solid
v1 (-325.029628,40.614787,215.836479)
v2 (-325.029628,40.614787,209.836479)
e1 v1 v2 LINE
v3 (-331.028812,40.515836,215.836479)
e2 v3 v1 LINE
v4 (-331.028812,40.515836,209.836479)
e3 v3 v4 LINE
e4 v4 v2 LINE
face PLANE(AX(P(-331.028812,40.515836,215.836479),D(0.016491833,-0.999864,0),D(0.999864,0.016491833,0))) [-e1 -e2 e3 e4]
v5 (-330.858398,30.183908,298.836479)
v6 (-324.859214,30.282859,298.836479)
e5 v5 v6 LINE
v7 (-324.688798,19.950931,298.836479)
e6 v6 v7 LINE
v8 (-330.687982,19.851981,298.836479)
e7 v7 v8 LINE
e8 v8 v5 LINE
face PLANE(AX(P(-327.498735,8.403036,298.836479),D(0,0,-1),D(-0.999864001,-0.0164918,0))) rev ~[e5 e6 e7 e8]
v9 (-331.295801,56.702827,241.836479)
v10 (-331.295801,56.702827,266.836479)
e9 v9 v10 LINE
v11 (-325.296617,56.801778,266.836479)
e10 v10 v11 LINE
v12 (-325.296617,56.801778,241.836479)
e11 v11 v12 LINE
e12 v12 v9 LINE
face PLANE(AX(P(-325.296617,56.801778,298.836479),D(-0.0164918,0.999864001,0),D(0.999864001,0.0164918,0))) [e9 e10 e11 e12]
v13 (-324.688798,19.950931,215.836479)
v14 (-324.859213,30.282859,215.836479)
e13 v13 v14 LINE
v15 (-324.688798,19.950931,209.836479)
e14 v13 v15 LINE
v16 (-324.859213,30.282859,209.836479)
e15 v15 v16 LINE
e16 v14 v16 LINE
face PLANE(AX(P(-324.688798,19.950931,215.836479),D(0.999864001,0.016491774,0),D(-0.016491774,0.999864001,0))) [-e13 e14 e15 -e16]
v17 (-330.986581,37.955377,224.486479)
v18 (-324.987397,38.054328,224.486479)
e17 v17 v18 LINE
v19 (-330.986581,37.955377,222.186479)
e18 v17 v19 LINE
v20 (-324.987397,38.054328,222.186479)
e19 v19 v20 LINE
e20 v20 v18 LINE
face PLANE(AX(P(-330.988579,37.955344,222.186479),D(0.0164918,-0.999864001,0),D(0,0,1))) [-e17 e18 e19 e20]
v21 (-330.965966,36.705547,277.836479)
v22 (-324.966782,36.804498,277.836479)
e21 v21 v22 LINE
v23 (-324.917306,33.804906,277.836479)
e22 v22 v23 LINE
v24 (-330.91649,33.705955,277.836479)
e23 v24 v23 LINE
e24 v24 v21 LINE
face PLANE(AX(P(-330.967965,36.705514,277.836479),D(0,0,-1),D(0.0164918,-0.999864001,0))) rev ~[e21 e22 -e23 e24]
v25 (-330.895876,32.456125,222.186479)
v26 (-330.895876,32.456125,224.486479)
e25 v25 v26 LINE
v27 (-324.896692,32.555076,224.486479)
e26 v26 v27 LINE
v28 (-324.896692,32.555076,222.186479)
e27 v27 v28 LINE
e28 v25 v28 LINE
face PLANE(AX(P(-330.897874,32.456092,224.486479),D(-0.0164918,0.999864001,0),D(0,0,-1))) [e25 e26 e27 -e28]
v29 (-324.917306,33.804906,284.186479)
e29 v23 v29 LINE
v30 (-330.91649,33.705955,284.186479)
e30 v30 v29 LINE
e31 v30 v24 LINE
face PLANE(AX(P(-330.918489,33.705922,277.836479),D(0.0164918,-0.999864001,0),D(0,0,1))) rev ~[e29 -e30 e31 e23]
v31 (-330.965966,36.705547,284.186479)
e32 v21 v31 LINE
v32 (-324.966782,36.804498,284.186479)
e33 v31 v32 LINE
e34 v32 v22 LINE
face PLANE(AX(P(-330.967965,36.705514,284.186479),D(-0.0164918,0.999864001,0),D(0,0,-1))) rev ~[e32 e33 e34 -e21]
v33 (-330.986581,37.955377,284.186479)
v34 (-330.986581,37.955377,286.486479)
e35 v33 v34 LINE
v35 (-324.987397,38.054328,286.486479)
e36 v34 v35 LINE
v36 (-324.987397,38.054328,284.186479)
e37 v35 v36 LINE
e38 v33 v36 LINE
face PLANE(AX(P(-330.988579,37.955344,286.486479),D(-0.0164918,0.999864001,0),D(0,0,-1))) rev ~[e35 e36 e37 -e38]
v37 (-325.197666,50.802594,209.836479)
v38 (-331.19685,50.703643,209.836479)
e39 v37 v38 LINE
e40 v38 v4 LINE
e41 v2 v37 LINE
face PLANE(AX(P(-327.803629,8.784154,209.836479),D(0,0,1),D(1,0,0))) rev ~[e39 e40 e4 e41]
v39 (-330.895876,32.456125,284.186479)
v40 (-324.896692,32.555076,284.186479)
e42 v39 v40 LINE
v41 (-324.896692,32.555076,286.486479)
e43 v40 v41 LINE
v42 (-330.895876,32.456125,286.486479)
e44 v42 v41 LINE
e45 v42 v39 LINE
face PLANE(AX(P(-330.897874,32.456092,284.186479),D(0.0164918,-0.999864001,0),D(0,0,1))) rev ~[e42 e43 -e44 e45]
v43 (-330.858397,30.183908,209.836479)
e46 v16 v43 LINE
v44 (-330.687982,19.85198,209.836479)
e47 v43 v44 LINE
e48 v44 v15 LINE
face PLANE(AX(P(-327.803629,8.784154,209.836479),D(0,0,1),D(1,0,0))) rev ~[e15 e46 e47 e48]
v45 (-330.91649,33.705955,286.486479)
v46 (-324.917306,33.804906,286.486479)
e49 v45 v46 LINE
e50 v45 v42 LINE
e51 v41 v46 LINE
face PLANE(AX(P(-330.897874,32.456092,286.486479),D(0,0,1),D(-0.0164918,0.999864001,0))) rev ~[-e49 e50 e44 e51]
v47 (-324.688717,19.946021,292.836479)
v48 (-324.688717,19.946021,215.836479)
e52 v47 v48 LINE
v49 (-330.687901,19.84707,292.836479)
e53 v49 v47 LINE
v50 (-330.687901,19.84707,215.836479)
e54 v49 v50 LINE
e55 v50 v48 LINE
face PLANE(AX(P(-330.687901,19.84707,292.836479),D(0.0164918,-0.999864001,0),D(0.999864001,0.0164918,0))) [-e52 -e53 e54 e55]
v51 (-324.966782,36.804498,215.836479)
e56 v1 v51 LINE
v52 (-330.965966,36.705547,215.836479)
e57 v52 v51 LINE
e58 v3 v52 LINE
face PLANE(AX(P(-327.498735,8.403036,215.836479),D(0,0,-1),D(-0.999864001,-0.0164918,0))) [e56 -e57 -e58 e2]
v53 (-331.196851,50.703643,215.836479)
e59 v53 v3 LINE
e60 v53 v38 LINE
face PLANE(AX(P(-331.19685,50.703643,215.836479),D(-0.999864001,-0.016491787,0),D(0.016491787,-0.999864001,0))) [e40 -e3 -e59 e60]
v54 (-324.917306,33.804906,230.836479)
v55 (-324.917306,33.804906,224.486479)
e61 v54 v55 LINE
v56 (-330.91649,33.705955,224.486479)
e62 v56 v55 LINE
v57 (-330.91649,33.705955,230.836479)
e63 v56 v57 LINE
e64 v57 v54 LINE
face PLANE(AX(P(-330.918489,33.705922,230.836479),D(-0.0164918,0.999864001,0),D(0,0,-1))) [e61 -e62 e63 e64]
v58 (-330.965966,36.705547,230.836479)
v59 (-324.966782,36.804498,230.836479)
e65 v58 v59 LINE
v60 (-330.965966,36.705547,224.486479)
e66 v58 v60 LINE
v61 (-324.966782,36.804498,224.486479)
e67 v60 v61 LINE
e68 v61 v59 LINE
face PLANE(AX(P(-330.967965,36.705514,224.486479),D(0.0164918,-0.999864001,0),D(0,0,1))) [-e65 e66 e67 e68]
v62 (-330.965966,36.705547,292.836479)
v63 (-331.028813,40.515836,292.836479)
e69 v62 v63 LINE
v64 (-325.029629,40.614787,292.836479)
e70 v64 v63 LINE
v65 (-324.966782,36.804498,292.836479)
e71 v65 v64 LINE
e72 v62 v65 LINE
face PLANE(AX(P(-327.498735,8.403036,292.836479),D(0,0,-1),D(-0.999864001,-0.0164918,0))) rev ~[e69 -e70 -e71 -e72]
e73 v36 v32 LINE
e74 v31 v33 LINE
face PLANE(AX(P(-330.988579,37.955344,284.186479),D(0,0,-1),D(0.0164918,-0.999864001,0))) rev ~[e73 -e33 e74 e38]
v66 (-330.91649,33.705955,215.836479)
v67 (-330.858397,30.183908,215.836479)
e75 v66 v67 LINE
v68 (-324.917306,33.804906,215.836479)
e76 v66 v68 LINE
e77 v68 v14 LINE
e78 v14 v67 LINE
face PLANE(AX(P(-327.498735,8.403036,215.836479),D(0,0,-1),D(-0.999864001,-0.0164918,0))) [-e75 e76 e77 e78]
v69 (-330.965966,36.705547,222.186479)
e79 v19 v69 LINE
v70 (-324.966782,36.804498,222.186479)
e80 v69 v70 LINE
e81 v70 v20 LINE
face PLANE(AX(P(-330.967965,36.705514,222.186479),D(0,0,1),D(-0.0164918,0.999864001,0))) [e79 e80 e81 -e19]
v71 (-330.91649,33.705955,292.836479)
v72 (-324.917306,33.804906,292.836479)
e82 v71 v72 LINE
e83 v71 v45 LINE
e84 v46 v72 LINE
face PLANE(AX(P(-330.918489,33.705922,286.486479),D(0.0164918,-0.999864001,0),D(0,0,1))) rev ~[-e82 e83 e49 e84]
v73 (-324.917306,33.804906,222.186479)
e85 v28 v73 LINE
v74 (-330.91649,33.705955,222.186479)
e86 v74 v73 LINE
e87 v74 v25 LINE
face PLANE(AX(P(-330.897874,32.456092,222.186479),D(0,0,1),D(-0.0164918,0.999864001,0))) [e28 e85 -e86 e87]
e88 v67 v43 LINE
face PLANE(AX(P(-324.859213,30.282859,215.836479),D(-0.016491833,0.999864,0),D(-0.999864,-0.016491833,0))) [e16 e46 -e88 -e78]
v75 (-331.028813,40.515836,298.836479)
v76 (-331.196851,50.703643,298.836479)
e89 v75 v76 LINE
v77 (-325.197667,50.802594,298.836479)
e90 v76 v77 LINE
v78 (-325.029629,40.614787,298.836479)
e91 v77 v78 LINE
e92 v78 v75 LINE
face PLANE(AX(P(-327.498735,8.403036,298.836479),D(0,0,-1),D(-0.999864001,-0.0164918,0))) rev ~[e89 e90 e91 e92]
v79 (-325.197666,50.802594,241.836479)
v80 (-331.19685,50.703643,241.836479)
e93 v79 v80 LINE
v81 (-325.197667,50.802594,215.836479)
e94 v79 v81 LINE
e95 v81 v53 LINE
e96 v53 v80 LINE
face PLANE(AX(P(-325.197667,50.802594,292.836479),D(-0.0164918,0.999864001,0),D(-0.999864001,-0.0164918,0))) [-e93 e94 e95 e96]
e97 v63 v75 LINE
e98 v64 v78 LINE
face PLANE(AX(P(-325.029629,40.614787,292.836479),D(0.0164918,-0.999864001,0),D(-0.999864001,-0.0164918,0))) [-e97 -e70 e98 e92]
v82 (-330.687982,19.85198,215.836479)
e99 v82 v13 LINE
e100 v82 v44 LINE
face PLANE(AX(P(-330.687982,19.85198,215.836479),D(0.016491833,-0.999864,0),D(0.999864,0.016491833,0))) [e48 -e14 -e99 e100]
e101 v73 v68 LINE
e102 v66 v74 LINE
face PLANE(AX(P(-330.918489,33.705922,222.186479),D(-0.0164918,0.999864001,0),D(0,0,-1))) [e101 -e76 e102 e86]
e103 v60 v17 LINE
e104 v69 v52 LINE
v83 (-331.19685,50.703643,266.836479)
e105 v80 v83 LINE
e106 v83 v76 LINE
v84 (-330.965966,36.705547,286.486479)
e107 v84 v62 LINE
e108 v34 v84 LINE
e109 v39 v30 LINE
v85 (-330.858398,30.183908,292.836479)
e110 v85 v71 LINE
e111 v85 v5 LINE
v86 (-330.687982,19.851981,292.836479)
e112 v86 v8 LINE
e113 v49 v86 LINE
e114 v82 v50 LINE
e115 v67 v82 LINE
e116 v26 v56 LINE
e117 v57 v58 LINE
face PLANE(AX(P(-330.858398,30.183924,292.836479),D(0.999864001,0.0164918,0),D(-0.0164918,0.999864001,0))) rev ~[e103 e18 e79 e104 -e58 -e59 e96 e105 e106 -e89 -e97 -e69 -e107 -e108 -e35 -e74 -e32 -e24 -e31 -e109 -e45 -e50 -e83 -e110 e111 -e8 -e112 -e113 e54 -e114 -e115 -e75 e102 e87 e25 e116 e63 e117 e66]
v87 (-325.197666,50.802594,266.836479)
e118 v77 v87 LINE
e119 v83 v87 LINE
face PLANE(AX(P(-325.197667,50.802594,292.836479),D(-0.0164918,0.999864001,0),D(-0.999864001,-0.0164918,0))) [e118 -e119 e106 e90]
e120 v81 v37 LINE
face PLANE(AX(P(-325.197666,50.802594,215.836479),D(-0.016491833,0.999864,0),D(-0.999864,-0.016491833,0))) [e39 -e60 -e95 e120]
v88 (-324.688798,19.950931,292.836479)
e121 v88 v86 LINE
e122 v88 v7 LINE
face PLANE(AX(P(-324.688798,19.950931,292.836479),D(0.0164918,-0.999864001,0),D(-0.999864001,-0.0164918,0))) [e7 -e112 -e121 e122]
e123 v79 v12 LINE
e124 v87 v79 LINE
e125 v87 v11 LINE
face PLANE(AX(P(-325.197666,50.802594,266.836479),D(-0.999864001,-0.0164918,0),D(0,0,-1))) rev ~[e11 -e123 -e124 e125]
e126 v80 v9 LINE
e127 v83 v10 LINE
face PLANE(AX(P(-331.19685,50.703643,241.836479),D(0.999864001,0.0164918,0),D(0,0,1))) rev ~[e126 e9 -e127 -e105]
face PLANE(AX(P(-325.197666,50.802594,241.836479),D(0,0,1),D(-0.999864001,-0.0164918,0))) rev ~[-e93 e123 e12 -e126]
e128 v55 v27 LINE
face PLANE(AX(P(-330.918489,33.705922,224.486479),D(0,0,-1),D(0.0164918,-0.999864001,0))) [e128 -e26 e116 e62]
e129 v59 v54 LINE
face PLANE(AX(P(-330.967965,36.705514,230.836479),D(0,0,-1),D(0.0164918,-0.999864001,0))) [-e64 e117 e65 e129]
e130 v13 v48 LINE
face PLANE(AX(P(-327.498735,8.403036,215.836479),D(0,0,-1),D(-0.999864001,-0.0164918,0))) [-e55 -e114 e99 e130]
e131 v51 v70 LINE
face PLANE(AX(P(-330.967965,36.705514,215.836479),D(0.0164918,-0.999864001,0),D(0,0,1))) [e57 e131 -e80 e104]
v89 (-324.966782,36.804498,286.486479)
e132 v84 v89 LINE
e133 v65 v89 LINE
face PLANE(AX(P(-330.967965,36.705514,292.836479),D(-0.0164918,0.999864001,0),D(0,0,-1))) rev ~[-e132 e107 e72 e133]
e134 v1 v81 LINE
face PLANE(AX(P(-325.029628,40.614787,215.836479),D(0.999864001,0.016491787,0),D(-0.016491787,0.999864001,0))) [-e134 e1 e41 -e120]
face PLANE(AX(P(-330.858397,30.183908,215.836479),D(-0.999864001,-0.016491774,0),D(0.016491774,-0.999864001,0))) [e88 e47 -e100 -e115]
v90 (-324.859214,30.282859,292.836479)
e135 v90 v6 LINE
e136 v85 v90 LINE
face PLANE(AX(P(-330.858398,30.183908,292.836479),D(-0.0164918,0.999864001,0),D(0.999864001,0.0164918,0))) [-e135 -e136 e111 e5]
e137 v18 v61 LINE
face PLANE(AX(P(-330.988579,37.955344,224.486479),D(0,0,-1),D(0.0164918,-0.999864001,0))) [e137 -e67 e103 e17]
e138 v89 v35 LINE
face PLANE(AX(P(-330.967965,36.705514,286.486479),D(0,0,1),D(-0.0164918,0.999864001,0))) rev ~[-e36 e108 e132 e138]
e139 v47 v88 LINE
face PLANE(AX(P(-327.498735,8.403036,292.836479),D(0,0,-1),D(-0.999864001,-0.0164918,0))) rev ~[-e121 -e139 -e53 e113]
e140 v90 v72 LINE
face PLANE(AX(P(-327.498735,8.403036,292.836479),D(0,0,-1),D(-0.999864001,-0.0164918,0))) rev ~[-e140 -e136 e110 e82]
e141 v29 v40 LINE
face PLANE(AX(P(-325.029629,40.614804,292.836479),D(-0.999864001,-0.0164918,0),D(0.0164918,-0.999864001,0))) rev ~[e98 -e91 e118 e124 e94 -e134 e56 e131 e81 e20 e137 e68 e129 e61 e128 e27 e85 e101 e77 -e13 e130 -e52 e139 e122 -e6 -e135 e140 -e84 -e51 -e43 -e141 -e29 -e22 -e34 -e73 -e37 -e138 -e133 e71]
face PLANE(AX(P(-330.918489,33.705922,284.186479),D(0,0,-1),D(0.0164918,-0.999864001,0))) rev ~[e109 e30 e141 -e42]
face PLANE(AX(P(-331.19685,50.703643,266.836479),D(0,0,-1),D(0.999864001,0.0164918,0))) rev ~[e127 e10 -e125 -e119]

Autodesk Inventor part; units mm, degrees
ref_plane "РабПлоскость1" through (-327.803629, 8.784154, 215.836479) normal (0, 0, 1) x (1, 0, 0)
sketch "Эскиз1" plane through (-327.803629, 8.784154, 215.836479) normal (0, 0, 1) x (1, 0, 0)
  line L0 (3.114831, 11.166777) -> (2.944416, 21.498705)
  line L1 (2.944416, 21.498705) -> (-3.054768, 21.399754)
  line L2 (-3.054768, 21.399754) -> (-2.884353, 11.067826)
  line L3 (-2.884353, 11.067826) -> (3.114831, 11.166777)
  line L4 (-3.393221, 41.919489) -> (-3.225183, 31.731682)
  line L5 (2.774001, 31.830633) -> (2.605963, 42.01844)
  line L6 (-3.225183, 31.731682) -> (2.774001, 31.830633)
  line L7 (2.605963, 42.01844) -> (-3.393221, 41.919489)
  line L8 (2.774001, 31.830633) -> (2.605963, 42.01844) construction
  line L9 (-3.393221, 41.919489) -> (-3.225183, 31.731682) construction
  line L10 (3.114831, 11.166777) -> (2.944416, 21.498705) construction
  line L11 (-3.054768, 21.399754) -> (-2.884353, 11.067826) construction
  line L12 (6.149374, 48.077701) -> (19.433282, 48.296806) construction
  line L13 (2.605963, 42.01844) -> (6.248325, 42.078517) construction
  point P0 (327.803629, -8.784154)
  dimension "d16" = 6
extrude "Выдавливание1" add sketch "Эскиз1" against normal blind 6
ref_plane "РабПлоскость2" through (-327.498735, 8.403036, 292.836479) normal (0, 0, -1) x (-0.999864, -0.0164918, 0)
sketch "Эскиз2" plane through (-327.498735, 8.403036, 292.836479) normal (0, 0, -1) x (-0.999864, -0.0164918, 0)
  line L0 (-3, 21.833317) -> (3, 21.833317)
  line L1 (3, 21.833317) -> (3, 11.499984)
  line L2 (3, 11.5) -> (-3, 11.5)
  line L3 (-3, 11.499984) -> (-3, 21.833317)
  line L4 (3, 32.16665) -> (-3, 32.16665)
  line L5 (-3, 32.16665) -> (-3, 42.355843)
  line L6 (-3, 42.5) -> (3, 42.5)
  line L7 (3, 42.355843) -> (3, 32.16665)
  line L8 (-3, 11.499984) -> (-3, 21.833317) construction
  line L9 (3, 21.833317) -> (3, 11.499984) construction
  line L10 (-3, 32.16665) -> (-3, 42.355843) construction
  line L11 (3, 42.355843) -> (3, 32.16665) construction
  point P0 (-327.315615, -13.802923)
sketch "Эскиз2 outline for Выдавливание2" plane through (-327.498735, 8.403036, 292.836479) normal (0, 0, -1) x (-0.999864, -0.0164918, 0)
  line L0 (3, 32.16665) -> (3, 42.355843)
  line L1 (-3, 32.16665) -> (3, 32.16665)
  line L2 (-3, 42.355843) -> (-3, 32.16665)
  line L3 (3, 42.355843) -> (-3, 42.355843)
  line L4 (-3, 21.833317) -> (-3, 11.499984)
  line L5 (3, 21.833317) -> (-3, 21.833317)
  line L6 (3, 11.499984) -> (3, 21.833317)
  line L7 (-3, 11.499984) -> (3, 11.499984)
extrude "Выдавливание2" add sketch "Эскиз2 outline for Выдавливание2" against normal blind 6
sketch "Эскиз3" plane through (-327.498735, 8.403036, 292.836479) normal (0, 0, -1) x (-0.999864, -0.0164918, 0)
  line L0 (6.642857, 42.355843) -> (3, 42.355843)
  line L1 (-3, 32.166667) -> (-3, 21.833333)
  line L2 (-3, 21.833333) -> (3, 21.833333)
  line L3 (3, 21.833333) -> (3, 32.166667)
  line L4 (3, 32.166667) -> (-3, 32.166667)
  line L5 (-3, 42.355843) -> (3, 42.355843)
  line L6 (3, 42.355843) -> (3, 11.495073)
  line L7 (3, 11.495073) -> (-3, 11.495073)
  line L8 (-3, 11.495073) -> (-3, 42.355843)
  point P0 (-327.315615, -13.802923)
  point P1 (-3, 21.833333)
  point P2 (3, 21.833333)
  point P3 (3, 42.355843)
extrude "Выдавливание3" add sketch "Эскиз3" along normal up to surface (77 mm away)
sketch "Эскиз4" plane through (-331.19685, 50.703643, 209.836479) normal (-0.999864, -0.0164918, 0) x (0, 0, 1)
  line L0 (0, -14) -> (6, -14) construction
  line L1 (0, -17) -> (6, -17) construction
  line L2 (6, -17) -> (6, -14)
  line L3 (6, -14) -> (12.35, -14)
  line L4 (12.35, -14) -> (12.35, -12.75)
  line L5 (12.35, -12.75) -> (14.65, -12.75)
  line L6 (14.65, -12.75) -> (14.65, -14)
  line L7 (14.65, -14) -> (21, -14)
  line L8 (21, -14) -> (21, -17)
  line L9 (21, -17) -> (14.65, -17)
  line L10 (14.65, -17) -> (14.65, -18.25)
  line L11 (14.65, -18.25) -> (12.35, -18.25)
  line L12 (12.35, -18.25) -> (12.35, -17)
  line L13 (12.35, -17) -> (6, -17)
  line L14 (0, -20.522506) -> (0, -30.855843) construction
  line L15 (89, -10.189193) -> (89, 0) construction
  line L16 (0, -30.855843) -> (89, 0) construction
  line L17 (44.5, 0) -> (44.5, -30.855843) construction
  line L18 (89, -14) -> (83, -14) construction
  line L19 (89, -17) -> (83, -17) construction
  line L20 (83, -17) -> (83, -14)
  line L21 (83, -14) -> (76.65, -14)
  line L22 (76.65, -14) -> (76.65, -12.75)
  line L23 (76.65, -12.75) -> (74.35, -12.75)
  line L24 (74.35, -12.75) -> (74.35, -14)
  line L25 (74.35, -14) -> (68, -14)
  line L26 (68, -14) -> (68, -17)
  line L27 (68, -17) -> (74.35, -17)
  line L28 (74.35, -17) -> (74.35, -18.25)
  line L29 (74.35, -18.25) -> (76.65, -18.25)
  line L30 (76.65, -18.25) -> (76.65, -17)
  line L31 (76.65, -17) -> (83, -17)
  point P0 (-209.836479, -56.158766)
  point P1 (44.5, -15.427922)
  dimension "d9" = 2.3
  dimension "d10" = 5.5
  dimension "d11" = 15
extrude "Выдавливание4" cut sketch "Эскиз4" against normal blind 6
ref_plane "РабПлоскость3" through (-672.954973, 50.067364, -86.377936) normal (-0.0164918, 0.999864, 0) x (0, 0, 1)
sketch "Эскиз6" plane through (-325.197666, 50.802594, 298.836479) normal (-0.0164918, 0.999864, 0) x (0.999864, 0.0164918, 0)
  line L0 (-6, 89) -> (-6, 0) construction
  line L1 (0, 0) -> (0, 89) construction
  line L2 (-6, 32) -> (0, 32)
  line L3 (0, 32) -> (0, 57)
  line L4 (0, 57) -> (-6, 57)
  line L5 (-6, 57) -> (-6, 32)
  line L6 (0, 89) -> (-6, 89) projected
  line L7 (-3, 89) -> (-3, 57) construction
  line L8 (-3, 32) -> (-3, 0) construction
  line L9 (0, 0) -> (-6, 0) projected
  point P0 (324.315615, 298.836479)
  dimension "d17" = 25
extrude "Выдавливание6" add sketch "Эскиз6" along normal blind 6
equation "\"d1\" = d0"
equation "\"d3\" = d0"
equation "\"d7\" = d0"
equation "\"d12\" = d3"
equation "\"d0\" = d16"
properties part number "motor1"
